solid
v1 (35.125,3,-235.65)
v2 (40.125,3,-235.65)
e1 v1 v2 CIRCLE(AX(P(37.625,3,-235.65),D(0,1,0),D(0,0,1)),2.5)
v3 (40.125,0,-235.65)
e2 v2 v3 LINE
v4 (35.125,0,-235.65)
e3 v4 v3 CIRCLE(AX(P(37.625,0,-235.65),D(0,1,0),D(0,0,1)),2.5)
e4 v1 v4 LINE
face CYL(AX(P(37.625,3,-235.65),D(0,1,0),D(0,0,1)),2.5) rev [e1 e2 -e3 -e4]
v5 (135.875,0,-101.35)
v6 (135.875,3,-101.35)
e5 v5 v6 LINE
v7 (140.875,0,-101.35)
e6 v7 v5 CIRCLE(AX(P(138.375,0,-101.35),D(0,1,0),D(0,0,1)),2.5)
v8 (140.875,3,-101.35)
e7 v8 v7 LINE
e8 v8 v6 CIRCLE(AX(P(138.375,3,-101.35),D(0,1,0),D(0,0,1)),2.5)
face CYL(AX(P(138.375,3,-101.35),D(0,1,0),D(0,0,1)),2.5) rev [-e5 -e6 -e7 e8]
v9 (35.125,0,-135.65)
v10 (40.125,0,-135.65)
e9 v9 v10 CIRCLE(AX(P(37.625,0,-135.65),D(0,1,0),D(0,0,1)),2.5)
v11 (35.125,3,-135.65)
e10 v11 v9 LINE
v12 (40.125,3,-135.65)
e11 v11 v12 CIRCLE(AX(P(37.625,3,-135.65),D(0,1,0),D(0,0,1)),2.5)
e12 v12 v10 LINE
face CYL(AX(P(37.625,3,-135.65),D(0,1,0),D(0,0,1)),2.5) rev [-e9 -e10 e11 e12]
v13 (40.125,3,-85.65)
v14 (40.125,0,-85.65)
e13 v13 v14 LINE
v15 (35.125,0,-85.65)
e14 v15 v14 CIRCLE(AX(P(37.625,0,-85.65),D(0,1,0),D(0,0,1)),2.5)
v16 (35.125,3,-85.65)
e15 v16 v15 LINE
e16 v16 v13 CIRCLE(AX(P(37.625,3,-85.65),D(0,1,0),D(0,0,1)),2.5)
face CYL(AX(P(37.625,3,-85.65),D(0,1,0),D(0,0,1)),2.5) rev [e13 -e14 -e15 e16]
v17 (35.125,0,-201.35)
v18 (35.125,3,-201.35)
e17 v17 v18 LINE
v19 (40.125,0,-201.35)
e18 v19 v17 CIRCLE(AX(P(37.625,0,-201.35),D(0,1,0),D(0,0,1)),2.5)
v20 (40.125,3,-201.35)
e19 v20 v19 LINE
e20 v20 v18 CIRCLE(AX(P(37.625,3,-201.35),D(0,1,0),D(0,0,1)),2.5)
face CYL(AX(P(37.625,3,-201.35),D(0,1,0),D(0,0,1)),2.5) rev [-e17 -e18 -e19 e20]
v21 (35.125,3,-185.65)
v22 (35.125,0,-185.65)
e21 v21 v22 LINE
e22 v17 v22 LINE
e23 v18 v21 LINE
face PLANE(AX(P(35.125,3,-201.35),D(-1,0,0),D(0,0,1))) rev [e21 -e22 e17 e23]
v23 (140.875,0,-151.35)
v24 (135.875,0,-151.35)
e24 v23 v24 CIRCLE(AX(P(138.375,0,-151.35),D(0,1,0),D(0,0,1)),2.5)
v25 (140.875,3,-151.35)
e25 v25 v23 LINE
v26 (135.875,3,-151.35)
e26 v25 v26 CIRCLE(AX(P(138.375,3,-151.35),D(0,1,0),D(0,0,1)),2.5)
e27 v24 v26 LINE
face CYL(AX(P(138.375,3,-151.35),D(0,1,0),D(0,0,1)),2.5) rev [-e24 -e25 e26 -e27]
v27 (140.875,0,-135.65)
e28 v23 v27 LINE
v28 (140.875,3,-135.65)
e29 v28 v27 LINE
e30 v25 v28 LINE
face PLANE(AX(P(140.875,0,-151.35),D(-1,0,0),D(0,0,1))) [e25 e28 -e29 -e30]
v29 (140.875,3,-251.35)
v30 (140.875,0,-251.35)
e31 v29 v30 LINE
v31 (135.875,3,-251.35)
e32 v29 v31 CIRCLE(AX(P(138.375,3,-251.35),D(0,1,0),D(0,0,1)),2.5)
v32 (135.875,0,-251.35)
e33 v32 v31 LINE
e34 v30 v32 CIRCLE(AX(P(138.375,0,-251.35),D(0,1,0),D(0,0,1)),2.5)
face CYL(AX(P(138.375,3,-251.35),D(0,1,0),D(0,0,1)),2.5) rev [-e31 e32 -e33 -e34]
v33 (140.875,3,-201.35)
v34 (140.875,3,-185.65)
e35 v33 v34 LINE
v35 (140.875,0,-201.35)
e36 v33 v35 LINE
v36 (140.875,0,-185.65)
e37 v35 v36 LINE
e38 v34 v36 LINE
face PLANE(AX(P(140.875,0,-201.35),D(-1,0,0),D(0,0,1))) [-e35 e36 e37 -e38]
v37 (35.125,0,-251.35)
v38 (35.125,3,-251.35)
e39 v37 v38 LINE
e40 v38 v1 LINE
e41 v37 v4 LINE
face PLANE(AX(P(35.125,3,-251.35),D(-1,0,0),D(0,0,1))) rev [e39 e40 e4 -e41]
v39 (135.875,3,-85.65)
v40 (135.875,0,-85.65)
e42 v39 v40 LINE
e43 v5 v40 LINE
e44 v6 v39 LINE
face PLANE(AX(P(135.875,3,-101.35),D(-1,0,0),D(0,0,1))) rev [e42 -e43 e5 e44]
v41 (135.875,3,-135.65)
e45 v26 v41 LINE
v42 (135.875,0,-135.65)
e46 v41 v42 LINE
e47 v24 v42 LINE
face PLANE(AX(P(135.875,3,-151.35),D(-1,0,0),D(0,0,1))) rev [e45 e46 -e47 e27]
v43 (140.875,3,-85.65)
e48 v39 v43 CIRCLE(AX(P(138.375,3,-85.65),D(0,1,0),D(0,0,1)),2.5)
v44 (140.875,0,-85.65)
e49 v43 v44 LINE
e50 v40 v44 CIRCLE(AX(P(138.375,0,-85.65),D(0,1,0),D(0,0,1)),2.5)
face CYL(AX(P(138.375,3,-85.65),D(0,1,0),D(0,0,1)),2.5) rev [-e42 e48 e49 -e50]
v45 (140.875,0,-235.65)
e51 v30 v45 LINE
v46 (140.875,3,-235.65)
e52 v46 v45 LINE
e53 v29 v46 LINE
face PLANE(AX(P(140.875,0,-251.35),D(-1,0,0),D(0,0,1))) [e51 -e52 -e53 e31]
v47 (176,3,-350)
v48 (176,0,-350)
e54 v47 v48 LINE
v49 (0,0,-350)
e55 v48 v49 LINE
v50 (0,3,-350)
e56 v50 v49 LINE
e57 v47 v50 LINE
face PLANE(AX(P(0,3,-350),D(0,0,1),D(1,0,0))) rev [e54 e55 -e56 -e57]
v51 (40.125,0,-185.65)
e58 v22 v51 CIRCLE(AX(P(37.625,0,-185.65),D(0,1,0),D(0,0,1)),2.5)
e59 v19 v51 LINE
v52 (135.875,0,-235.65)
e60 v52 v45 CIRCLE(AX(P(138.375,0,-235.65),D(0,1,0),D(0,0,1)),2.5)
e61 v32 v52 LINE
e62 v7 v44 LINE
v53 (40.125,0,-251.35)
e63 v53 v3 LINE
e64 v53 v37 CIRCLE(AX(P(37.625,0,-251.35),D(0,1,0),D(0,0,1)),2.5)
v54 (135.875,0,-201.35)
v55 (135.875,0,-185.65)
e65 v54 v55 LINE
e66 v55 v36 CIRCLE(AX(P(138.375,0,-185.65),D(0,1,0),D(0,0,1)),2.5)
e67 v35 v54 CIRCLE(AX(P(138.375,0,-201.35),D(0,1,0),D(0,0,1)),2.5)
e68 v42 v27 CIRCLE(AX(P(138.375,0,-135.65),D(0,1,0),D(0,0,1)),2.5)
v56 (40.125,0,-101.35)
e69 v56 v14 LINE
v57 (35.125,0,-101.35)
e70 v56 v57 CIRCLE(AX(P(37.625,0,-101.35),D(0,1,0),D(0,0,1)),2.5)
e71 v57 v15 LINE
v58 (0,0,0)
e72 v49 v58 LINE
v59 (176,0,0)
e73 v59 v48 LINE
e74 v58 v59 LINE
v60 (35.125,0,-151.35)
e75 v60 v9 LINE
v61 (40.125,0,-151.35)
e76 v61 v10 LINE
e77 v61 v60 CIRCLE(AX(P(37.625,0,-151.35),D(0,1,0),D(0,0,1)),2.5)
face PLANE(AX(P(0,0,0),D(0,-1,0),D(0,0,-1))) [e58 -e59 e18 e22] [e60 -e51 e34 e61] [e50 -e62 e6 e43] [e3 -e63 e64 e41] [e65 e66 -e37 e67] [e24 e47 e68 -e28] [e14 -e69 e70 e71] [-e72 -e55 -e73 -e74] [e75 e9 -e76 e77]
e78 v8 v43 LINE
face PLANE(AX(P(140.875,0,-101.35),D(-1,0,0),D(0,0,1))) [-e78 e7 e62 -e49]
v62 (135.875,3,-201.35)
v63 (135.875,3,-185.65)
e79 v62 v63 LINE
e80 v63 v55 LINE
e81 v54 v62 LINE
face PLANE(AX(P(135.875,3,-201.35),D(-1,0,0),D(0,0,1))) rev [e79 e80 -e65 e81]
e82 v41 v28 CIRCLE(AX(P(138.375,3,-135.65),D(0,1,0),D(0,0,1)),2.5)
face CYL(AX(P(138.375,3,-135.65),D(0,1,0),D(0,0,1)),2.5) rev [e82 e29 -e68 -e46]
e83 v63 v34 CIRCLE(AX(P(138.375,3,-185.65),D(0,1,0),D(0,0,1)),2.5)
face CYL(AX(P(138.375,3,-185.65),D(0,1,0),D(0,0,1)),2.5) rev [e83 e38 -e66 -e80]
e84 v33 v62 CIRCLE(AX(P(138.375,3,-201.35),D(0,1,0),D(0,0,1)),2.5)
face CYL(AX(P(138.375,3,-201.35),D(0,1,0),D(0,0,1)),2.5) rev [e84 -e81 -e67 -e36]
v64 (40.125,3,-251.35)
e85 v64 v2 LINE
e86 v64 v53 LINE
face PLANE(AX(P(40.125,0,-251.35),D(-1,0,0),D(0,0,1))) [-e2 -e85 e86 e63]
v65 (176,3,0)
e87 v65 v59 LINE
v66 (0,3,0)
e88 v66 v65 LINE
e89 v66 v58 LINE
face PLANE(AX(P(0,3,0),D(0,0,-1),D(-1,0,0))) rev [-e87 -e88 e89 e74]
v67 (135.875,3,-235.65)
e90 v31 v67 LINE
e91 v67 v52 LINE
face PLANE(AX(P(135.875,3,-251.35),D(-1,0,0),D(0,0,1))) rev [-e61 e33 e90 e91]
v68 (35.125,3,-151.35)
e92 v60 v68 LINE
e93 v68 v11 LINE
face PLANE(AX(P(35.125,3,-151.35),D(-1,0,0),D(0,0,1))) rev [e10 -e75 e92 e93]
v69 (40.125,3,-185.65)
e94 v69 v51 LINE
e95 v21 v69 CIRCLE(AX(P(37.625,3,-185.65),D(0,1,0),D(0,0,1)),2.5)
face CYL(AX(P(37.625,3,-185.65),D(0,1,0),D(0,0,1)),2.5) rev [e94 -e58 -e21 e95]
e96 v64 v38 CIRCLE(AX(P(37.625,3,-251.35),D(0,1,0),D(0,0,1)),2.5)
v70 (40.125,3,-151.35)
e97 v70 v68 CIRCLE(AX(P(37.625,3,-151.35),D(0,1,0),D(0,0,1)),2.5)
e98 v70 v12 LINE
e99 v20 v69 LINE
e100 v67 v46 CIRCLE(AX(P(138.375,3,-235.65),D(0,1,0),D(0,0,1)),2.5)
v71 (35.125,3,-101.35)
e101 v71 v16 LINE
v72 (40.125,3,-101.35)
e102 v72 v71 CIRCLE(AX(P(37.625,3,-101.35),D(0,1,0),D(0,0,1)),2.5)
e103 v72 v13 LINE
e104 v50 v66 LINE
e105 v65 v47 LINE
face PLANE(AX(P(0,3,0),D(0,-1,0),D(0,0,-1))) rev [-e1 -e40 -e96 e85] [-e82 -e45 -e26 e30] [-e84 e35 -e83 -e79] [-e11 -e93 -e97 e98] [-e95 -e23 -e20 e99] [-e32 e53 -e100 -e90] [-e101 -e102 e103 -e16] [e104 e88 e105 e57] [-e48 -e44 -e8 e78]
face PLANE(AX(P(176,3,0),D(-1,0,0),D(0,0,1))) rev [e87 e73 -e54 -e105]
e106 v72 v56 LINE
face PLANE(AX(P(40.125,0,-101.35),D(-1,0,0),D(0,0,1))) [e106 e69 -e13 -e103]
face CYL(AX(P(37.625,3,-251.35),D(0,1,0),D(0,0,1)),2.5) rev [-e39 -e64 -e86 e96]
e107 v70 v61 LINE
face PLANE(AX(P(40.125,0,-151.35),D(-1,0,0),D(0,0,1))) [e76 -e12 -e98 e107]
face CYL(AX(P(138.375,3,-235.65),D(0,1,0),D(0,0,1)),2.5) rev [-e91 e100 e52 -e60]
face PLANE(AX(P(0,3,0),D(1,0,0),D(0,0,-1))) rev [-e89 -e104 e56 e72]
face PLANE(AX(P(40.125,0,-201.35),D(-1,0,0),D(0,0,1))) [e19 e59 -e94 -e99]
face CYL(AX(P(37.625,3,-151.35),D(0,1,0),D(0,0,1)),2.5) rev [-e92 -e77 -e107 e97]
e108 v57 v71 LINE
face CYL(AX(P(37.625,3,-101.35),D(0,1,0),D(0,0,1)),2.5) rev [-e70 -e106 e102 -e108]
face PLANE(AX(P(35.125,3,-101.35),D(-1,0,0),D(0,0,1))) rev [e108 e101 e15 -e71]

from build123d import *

# Parameters (mm, degrees)
SKETCH1_W                 = 176
SKETCH1_H                 = 350
BOSS_EXTRUDE1_DEPTH       = 3
F_5_0MM_DOWEL_SLOT1_DEPTH = 3


# Read off the part's stored shape, not the designer's step: Ø5.0mm Dowel Slot1
with BuildPart() as part:
    # Sketch1 → Boss-Extrude1 (new body)
    with BuildSketch(Plane(origin=(0, 0, 0), x_dir=(1, 0, 0), z_dir=(0, 1, 0))):
        with Locations((88, 175)):
            Rectangle(SKETCH1_W, SKETCH1_H)
    extrude(amount=BOSS_EXTRUDE1_DEPTH)

    # Ø5.0mm Dowel Slot1 outline → Ø5.0mm Dowel Slot1 (cut)
    with BuildSketch(Plane(origin=(0, 0, 0), x_dir=(1, 0, 0), z_dir=(0, 1, 0))):
        with BuildLine():
            Line((35.125, 251.35), (35.125, 235.65))
            ThreePointArc((35.125, 235.65), (37.625, 233.15), (40.125, 235.65))
            Line((40.125, 235.65), (40.125, 251.35))
            ThreePointArc((40.125, 251.35), (37.625, 253.85), (35.125, 251.35))
        make_face()
        with BuildLine():
            Line((40.125, 185.65), (40.125, 201.35))
            ThreePointArc((40.125, 201.35), (37.625, 203.85), (35.125, 201.35))
            Line((35.125, 201.35), (35.125, 185.65))
            ThreePointArc((35.125, 185.65), (37.625, 183.15), (40.125, 185.65))
        make_face()
        with BuildLine():
            Line((40.125, 135.65), (40.125, 151.35))
            ThreePointArc((40.125, 151.35), (37.625, 153.85), (35.125, 151.35))
            Line((35.125, 151.35), (35.125, 135.65))
            ThreePointArc((35.125, 135.65), (37.625, 133.15), (40.125, 135.65))
        make_face()
        with BuildLine():
            Line((40.125, 85.65), (40.125, 101.35))
            ThreePointArc((40.125, 101.35), (37.625, 103.85), (35.125, 101.35))
            Line((35.125, 101.35), (35.125, 85.65))
            ThreePointArc((35.125, 85.65), (37.625, 83.15), (40.125, 85.65))
        make_face()
        with BuildLine():
            Line((135.875, 251.35), (135.875, 235.65))
            ThreePointArc((135.875, 235.65), (138.375, 233.15), (140.875, 235.65))
            Line((140.875, 235.65), (140.875, 251.35))
            ThreePointArc((140.875, 251.35), (138.375, 253.85), (135.875, 251.35))
        make_face()
        with BuildLine():
            Line((140.875, 185.65), (140.875, 201.35))
            ThreePointArc((140.875, 201.35), (138.375, 203.85), (135.875, 201.35))
            Line((135.875, 201.35), (135.875, 185.65))
            ThreePointArc((135.875, 185.65), (138.375, 183.15), (140.875, 185.65))
        make_face()
        with BuildLine():
            Line((140.875, 135.65), (140.875, 151.35))
            ThreePointArc((140.875, 151.35), (138.375, 153.85), (135.875, 151.35))
            Line((135.875, 151.35), (135.875, 135.65))
            ThreePointArc((135.875, 135.65), (138.375, 133.15), (140.875, 135.65))
        make_face()
        with BuildLine():
            Line((140.875, 85.65), (140.875, 101.35))
            ThreePointArc((140.875, 101.35), (138.375, 103.85), (135.875, 101.35))
            Line((135.875, 101.35), (135.875, 85.65))
            ThreePointArc((135.875, 85.65), (138.375, 83.15), (140.875, 85.65))
        make_face()
    extrude(amount=F_5_0MM_DOWEL_SLOT1_DEPTH, mode=Mode.SUBTRACT)


solid = part.part
